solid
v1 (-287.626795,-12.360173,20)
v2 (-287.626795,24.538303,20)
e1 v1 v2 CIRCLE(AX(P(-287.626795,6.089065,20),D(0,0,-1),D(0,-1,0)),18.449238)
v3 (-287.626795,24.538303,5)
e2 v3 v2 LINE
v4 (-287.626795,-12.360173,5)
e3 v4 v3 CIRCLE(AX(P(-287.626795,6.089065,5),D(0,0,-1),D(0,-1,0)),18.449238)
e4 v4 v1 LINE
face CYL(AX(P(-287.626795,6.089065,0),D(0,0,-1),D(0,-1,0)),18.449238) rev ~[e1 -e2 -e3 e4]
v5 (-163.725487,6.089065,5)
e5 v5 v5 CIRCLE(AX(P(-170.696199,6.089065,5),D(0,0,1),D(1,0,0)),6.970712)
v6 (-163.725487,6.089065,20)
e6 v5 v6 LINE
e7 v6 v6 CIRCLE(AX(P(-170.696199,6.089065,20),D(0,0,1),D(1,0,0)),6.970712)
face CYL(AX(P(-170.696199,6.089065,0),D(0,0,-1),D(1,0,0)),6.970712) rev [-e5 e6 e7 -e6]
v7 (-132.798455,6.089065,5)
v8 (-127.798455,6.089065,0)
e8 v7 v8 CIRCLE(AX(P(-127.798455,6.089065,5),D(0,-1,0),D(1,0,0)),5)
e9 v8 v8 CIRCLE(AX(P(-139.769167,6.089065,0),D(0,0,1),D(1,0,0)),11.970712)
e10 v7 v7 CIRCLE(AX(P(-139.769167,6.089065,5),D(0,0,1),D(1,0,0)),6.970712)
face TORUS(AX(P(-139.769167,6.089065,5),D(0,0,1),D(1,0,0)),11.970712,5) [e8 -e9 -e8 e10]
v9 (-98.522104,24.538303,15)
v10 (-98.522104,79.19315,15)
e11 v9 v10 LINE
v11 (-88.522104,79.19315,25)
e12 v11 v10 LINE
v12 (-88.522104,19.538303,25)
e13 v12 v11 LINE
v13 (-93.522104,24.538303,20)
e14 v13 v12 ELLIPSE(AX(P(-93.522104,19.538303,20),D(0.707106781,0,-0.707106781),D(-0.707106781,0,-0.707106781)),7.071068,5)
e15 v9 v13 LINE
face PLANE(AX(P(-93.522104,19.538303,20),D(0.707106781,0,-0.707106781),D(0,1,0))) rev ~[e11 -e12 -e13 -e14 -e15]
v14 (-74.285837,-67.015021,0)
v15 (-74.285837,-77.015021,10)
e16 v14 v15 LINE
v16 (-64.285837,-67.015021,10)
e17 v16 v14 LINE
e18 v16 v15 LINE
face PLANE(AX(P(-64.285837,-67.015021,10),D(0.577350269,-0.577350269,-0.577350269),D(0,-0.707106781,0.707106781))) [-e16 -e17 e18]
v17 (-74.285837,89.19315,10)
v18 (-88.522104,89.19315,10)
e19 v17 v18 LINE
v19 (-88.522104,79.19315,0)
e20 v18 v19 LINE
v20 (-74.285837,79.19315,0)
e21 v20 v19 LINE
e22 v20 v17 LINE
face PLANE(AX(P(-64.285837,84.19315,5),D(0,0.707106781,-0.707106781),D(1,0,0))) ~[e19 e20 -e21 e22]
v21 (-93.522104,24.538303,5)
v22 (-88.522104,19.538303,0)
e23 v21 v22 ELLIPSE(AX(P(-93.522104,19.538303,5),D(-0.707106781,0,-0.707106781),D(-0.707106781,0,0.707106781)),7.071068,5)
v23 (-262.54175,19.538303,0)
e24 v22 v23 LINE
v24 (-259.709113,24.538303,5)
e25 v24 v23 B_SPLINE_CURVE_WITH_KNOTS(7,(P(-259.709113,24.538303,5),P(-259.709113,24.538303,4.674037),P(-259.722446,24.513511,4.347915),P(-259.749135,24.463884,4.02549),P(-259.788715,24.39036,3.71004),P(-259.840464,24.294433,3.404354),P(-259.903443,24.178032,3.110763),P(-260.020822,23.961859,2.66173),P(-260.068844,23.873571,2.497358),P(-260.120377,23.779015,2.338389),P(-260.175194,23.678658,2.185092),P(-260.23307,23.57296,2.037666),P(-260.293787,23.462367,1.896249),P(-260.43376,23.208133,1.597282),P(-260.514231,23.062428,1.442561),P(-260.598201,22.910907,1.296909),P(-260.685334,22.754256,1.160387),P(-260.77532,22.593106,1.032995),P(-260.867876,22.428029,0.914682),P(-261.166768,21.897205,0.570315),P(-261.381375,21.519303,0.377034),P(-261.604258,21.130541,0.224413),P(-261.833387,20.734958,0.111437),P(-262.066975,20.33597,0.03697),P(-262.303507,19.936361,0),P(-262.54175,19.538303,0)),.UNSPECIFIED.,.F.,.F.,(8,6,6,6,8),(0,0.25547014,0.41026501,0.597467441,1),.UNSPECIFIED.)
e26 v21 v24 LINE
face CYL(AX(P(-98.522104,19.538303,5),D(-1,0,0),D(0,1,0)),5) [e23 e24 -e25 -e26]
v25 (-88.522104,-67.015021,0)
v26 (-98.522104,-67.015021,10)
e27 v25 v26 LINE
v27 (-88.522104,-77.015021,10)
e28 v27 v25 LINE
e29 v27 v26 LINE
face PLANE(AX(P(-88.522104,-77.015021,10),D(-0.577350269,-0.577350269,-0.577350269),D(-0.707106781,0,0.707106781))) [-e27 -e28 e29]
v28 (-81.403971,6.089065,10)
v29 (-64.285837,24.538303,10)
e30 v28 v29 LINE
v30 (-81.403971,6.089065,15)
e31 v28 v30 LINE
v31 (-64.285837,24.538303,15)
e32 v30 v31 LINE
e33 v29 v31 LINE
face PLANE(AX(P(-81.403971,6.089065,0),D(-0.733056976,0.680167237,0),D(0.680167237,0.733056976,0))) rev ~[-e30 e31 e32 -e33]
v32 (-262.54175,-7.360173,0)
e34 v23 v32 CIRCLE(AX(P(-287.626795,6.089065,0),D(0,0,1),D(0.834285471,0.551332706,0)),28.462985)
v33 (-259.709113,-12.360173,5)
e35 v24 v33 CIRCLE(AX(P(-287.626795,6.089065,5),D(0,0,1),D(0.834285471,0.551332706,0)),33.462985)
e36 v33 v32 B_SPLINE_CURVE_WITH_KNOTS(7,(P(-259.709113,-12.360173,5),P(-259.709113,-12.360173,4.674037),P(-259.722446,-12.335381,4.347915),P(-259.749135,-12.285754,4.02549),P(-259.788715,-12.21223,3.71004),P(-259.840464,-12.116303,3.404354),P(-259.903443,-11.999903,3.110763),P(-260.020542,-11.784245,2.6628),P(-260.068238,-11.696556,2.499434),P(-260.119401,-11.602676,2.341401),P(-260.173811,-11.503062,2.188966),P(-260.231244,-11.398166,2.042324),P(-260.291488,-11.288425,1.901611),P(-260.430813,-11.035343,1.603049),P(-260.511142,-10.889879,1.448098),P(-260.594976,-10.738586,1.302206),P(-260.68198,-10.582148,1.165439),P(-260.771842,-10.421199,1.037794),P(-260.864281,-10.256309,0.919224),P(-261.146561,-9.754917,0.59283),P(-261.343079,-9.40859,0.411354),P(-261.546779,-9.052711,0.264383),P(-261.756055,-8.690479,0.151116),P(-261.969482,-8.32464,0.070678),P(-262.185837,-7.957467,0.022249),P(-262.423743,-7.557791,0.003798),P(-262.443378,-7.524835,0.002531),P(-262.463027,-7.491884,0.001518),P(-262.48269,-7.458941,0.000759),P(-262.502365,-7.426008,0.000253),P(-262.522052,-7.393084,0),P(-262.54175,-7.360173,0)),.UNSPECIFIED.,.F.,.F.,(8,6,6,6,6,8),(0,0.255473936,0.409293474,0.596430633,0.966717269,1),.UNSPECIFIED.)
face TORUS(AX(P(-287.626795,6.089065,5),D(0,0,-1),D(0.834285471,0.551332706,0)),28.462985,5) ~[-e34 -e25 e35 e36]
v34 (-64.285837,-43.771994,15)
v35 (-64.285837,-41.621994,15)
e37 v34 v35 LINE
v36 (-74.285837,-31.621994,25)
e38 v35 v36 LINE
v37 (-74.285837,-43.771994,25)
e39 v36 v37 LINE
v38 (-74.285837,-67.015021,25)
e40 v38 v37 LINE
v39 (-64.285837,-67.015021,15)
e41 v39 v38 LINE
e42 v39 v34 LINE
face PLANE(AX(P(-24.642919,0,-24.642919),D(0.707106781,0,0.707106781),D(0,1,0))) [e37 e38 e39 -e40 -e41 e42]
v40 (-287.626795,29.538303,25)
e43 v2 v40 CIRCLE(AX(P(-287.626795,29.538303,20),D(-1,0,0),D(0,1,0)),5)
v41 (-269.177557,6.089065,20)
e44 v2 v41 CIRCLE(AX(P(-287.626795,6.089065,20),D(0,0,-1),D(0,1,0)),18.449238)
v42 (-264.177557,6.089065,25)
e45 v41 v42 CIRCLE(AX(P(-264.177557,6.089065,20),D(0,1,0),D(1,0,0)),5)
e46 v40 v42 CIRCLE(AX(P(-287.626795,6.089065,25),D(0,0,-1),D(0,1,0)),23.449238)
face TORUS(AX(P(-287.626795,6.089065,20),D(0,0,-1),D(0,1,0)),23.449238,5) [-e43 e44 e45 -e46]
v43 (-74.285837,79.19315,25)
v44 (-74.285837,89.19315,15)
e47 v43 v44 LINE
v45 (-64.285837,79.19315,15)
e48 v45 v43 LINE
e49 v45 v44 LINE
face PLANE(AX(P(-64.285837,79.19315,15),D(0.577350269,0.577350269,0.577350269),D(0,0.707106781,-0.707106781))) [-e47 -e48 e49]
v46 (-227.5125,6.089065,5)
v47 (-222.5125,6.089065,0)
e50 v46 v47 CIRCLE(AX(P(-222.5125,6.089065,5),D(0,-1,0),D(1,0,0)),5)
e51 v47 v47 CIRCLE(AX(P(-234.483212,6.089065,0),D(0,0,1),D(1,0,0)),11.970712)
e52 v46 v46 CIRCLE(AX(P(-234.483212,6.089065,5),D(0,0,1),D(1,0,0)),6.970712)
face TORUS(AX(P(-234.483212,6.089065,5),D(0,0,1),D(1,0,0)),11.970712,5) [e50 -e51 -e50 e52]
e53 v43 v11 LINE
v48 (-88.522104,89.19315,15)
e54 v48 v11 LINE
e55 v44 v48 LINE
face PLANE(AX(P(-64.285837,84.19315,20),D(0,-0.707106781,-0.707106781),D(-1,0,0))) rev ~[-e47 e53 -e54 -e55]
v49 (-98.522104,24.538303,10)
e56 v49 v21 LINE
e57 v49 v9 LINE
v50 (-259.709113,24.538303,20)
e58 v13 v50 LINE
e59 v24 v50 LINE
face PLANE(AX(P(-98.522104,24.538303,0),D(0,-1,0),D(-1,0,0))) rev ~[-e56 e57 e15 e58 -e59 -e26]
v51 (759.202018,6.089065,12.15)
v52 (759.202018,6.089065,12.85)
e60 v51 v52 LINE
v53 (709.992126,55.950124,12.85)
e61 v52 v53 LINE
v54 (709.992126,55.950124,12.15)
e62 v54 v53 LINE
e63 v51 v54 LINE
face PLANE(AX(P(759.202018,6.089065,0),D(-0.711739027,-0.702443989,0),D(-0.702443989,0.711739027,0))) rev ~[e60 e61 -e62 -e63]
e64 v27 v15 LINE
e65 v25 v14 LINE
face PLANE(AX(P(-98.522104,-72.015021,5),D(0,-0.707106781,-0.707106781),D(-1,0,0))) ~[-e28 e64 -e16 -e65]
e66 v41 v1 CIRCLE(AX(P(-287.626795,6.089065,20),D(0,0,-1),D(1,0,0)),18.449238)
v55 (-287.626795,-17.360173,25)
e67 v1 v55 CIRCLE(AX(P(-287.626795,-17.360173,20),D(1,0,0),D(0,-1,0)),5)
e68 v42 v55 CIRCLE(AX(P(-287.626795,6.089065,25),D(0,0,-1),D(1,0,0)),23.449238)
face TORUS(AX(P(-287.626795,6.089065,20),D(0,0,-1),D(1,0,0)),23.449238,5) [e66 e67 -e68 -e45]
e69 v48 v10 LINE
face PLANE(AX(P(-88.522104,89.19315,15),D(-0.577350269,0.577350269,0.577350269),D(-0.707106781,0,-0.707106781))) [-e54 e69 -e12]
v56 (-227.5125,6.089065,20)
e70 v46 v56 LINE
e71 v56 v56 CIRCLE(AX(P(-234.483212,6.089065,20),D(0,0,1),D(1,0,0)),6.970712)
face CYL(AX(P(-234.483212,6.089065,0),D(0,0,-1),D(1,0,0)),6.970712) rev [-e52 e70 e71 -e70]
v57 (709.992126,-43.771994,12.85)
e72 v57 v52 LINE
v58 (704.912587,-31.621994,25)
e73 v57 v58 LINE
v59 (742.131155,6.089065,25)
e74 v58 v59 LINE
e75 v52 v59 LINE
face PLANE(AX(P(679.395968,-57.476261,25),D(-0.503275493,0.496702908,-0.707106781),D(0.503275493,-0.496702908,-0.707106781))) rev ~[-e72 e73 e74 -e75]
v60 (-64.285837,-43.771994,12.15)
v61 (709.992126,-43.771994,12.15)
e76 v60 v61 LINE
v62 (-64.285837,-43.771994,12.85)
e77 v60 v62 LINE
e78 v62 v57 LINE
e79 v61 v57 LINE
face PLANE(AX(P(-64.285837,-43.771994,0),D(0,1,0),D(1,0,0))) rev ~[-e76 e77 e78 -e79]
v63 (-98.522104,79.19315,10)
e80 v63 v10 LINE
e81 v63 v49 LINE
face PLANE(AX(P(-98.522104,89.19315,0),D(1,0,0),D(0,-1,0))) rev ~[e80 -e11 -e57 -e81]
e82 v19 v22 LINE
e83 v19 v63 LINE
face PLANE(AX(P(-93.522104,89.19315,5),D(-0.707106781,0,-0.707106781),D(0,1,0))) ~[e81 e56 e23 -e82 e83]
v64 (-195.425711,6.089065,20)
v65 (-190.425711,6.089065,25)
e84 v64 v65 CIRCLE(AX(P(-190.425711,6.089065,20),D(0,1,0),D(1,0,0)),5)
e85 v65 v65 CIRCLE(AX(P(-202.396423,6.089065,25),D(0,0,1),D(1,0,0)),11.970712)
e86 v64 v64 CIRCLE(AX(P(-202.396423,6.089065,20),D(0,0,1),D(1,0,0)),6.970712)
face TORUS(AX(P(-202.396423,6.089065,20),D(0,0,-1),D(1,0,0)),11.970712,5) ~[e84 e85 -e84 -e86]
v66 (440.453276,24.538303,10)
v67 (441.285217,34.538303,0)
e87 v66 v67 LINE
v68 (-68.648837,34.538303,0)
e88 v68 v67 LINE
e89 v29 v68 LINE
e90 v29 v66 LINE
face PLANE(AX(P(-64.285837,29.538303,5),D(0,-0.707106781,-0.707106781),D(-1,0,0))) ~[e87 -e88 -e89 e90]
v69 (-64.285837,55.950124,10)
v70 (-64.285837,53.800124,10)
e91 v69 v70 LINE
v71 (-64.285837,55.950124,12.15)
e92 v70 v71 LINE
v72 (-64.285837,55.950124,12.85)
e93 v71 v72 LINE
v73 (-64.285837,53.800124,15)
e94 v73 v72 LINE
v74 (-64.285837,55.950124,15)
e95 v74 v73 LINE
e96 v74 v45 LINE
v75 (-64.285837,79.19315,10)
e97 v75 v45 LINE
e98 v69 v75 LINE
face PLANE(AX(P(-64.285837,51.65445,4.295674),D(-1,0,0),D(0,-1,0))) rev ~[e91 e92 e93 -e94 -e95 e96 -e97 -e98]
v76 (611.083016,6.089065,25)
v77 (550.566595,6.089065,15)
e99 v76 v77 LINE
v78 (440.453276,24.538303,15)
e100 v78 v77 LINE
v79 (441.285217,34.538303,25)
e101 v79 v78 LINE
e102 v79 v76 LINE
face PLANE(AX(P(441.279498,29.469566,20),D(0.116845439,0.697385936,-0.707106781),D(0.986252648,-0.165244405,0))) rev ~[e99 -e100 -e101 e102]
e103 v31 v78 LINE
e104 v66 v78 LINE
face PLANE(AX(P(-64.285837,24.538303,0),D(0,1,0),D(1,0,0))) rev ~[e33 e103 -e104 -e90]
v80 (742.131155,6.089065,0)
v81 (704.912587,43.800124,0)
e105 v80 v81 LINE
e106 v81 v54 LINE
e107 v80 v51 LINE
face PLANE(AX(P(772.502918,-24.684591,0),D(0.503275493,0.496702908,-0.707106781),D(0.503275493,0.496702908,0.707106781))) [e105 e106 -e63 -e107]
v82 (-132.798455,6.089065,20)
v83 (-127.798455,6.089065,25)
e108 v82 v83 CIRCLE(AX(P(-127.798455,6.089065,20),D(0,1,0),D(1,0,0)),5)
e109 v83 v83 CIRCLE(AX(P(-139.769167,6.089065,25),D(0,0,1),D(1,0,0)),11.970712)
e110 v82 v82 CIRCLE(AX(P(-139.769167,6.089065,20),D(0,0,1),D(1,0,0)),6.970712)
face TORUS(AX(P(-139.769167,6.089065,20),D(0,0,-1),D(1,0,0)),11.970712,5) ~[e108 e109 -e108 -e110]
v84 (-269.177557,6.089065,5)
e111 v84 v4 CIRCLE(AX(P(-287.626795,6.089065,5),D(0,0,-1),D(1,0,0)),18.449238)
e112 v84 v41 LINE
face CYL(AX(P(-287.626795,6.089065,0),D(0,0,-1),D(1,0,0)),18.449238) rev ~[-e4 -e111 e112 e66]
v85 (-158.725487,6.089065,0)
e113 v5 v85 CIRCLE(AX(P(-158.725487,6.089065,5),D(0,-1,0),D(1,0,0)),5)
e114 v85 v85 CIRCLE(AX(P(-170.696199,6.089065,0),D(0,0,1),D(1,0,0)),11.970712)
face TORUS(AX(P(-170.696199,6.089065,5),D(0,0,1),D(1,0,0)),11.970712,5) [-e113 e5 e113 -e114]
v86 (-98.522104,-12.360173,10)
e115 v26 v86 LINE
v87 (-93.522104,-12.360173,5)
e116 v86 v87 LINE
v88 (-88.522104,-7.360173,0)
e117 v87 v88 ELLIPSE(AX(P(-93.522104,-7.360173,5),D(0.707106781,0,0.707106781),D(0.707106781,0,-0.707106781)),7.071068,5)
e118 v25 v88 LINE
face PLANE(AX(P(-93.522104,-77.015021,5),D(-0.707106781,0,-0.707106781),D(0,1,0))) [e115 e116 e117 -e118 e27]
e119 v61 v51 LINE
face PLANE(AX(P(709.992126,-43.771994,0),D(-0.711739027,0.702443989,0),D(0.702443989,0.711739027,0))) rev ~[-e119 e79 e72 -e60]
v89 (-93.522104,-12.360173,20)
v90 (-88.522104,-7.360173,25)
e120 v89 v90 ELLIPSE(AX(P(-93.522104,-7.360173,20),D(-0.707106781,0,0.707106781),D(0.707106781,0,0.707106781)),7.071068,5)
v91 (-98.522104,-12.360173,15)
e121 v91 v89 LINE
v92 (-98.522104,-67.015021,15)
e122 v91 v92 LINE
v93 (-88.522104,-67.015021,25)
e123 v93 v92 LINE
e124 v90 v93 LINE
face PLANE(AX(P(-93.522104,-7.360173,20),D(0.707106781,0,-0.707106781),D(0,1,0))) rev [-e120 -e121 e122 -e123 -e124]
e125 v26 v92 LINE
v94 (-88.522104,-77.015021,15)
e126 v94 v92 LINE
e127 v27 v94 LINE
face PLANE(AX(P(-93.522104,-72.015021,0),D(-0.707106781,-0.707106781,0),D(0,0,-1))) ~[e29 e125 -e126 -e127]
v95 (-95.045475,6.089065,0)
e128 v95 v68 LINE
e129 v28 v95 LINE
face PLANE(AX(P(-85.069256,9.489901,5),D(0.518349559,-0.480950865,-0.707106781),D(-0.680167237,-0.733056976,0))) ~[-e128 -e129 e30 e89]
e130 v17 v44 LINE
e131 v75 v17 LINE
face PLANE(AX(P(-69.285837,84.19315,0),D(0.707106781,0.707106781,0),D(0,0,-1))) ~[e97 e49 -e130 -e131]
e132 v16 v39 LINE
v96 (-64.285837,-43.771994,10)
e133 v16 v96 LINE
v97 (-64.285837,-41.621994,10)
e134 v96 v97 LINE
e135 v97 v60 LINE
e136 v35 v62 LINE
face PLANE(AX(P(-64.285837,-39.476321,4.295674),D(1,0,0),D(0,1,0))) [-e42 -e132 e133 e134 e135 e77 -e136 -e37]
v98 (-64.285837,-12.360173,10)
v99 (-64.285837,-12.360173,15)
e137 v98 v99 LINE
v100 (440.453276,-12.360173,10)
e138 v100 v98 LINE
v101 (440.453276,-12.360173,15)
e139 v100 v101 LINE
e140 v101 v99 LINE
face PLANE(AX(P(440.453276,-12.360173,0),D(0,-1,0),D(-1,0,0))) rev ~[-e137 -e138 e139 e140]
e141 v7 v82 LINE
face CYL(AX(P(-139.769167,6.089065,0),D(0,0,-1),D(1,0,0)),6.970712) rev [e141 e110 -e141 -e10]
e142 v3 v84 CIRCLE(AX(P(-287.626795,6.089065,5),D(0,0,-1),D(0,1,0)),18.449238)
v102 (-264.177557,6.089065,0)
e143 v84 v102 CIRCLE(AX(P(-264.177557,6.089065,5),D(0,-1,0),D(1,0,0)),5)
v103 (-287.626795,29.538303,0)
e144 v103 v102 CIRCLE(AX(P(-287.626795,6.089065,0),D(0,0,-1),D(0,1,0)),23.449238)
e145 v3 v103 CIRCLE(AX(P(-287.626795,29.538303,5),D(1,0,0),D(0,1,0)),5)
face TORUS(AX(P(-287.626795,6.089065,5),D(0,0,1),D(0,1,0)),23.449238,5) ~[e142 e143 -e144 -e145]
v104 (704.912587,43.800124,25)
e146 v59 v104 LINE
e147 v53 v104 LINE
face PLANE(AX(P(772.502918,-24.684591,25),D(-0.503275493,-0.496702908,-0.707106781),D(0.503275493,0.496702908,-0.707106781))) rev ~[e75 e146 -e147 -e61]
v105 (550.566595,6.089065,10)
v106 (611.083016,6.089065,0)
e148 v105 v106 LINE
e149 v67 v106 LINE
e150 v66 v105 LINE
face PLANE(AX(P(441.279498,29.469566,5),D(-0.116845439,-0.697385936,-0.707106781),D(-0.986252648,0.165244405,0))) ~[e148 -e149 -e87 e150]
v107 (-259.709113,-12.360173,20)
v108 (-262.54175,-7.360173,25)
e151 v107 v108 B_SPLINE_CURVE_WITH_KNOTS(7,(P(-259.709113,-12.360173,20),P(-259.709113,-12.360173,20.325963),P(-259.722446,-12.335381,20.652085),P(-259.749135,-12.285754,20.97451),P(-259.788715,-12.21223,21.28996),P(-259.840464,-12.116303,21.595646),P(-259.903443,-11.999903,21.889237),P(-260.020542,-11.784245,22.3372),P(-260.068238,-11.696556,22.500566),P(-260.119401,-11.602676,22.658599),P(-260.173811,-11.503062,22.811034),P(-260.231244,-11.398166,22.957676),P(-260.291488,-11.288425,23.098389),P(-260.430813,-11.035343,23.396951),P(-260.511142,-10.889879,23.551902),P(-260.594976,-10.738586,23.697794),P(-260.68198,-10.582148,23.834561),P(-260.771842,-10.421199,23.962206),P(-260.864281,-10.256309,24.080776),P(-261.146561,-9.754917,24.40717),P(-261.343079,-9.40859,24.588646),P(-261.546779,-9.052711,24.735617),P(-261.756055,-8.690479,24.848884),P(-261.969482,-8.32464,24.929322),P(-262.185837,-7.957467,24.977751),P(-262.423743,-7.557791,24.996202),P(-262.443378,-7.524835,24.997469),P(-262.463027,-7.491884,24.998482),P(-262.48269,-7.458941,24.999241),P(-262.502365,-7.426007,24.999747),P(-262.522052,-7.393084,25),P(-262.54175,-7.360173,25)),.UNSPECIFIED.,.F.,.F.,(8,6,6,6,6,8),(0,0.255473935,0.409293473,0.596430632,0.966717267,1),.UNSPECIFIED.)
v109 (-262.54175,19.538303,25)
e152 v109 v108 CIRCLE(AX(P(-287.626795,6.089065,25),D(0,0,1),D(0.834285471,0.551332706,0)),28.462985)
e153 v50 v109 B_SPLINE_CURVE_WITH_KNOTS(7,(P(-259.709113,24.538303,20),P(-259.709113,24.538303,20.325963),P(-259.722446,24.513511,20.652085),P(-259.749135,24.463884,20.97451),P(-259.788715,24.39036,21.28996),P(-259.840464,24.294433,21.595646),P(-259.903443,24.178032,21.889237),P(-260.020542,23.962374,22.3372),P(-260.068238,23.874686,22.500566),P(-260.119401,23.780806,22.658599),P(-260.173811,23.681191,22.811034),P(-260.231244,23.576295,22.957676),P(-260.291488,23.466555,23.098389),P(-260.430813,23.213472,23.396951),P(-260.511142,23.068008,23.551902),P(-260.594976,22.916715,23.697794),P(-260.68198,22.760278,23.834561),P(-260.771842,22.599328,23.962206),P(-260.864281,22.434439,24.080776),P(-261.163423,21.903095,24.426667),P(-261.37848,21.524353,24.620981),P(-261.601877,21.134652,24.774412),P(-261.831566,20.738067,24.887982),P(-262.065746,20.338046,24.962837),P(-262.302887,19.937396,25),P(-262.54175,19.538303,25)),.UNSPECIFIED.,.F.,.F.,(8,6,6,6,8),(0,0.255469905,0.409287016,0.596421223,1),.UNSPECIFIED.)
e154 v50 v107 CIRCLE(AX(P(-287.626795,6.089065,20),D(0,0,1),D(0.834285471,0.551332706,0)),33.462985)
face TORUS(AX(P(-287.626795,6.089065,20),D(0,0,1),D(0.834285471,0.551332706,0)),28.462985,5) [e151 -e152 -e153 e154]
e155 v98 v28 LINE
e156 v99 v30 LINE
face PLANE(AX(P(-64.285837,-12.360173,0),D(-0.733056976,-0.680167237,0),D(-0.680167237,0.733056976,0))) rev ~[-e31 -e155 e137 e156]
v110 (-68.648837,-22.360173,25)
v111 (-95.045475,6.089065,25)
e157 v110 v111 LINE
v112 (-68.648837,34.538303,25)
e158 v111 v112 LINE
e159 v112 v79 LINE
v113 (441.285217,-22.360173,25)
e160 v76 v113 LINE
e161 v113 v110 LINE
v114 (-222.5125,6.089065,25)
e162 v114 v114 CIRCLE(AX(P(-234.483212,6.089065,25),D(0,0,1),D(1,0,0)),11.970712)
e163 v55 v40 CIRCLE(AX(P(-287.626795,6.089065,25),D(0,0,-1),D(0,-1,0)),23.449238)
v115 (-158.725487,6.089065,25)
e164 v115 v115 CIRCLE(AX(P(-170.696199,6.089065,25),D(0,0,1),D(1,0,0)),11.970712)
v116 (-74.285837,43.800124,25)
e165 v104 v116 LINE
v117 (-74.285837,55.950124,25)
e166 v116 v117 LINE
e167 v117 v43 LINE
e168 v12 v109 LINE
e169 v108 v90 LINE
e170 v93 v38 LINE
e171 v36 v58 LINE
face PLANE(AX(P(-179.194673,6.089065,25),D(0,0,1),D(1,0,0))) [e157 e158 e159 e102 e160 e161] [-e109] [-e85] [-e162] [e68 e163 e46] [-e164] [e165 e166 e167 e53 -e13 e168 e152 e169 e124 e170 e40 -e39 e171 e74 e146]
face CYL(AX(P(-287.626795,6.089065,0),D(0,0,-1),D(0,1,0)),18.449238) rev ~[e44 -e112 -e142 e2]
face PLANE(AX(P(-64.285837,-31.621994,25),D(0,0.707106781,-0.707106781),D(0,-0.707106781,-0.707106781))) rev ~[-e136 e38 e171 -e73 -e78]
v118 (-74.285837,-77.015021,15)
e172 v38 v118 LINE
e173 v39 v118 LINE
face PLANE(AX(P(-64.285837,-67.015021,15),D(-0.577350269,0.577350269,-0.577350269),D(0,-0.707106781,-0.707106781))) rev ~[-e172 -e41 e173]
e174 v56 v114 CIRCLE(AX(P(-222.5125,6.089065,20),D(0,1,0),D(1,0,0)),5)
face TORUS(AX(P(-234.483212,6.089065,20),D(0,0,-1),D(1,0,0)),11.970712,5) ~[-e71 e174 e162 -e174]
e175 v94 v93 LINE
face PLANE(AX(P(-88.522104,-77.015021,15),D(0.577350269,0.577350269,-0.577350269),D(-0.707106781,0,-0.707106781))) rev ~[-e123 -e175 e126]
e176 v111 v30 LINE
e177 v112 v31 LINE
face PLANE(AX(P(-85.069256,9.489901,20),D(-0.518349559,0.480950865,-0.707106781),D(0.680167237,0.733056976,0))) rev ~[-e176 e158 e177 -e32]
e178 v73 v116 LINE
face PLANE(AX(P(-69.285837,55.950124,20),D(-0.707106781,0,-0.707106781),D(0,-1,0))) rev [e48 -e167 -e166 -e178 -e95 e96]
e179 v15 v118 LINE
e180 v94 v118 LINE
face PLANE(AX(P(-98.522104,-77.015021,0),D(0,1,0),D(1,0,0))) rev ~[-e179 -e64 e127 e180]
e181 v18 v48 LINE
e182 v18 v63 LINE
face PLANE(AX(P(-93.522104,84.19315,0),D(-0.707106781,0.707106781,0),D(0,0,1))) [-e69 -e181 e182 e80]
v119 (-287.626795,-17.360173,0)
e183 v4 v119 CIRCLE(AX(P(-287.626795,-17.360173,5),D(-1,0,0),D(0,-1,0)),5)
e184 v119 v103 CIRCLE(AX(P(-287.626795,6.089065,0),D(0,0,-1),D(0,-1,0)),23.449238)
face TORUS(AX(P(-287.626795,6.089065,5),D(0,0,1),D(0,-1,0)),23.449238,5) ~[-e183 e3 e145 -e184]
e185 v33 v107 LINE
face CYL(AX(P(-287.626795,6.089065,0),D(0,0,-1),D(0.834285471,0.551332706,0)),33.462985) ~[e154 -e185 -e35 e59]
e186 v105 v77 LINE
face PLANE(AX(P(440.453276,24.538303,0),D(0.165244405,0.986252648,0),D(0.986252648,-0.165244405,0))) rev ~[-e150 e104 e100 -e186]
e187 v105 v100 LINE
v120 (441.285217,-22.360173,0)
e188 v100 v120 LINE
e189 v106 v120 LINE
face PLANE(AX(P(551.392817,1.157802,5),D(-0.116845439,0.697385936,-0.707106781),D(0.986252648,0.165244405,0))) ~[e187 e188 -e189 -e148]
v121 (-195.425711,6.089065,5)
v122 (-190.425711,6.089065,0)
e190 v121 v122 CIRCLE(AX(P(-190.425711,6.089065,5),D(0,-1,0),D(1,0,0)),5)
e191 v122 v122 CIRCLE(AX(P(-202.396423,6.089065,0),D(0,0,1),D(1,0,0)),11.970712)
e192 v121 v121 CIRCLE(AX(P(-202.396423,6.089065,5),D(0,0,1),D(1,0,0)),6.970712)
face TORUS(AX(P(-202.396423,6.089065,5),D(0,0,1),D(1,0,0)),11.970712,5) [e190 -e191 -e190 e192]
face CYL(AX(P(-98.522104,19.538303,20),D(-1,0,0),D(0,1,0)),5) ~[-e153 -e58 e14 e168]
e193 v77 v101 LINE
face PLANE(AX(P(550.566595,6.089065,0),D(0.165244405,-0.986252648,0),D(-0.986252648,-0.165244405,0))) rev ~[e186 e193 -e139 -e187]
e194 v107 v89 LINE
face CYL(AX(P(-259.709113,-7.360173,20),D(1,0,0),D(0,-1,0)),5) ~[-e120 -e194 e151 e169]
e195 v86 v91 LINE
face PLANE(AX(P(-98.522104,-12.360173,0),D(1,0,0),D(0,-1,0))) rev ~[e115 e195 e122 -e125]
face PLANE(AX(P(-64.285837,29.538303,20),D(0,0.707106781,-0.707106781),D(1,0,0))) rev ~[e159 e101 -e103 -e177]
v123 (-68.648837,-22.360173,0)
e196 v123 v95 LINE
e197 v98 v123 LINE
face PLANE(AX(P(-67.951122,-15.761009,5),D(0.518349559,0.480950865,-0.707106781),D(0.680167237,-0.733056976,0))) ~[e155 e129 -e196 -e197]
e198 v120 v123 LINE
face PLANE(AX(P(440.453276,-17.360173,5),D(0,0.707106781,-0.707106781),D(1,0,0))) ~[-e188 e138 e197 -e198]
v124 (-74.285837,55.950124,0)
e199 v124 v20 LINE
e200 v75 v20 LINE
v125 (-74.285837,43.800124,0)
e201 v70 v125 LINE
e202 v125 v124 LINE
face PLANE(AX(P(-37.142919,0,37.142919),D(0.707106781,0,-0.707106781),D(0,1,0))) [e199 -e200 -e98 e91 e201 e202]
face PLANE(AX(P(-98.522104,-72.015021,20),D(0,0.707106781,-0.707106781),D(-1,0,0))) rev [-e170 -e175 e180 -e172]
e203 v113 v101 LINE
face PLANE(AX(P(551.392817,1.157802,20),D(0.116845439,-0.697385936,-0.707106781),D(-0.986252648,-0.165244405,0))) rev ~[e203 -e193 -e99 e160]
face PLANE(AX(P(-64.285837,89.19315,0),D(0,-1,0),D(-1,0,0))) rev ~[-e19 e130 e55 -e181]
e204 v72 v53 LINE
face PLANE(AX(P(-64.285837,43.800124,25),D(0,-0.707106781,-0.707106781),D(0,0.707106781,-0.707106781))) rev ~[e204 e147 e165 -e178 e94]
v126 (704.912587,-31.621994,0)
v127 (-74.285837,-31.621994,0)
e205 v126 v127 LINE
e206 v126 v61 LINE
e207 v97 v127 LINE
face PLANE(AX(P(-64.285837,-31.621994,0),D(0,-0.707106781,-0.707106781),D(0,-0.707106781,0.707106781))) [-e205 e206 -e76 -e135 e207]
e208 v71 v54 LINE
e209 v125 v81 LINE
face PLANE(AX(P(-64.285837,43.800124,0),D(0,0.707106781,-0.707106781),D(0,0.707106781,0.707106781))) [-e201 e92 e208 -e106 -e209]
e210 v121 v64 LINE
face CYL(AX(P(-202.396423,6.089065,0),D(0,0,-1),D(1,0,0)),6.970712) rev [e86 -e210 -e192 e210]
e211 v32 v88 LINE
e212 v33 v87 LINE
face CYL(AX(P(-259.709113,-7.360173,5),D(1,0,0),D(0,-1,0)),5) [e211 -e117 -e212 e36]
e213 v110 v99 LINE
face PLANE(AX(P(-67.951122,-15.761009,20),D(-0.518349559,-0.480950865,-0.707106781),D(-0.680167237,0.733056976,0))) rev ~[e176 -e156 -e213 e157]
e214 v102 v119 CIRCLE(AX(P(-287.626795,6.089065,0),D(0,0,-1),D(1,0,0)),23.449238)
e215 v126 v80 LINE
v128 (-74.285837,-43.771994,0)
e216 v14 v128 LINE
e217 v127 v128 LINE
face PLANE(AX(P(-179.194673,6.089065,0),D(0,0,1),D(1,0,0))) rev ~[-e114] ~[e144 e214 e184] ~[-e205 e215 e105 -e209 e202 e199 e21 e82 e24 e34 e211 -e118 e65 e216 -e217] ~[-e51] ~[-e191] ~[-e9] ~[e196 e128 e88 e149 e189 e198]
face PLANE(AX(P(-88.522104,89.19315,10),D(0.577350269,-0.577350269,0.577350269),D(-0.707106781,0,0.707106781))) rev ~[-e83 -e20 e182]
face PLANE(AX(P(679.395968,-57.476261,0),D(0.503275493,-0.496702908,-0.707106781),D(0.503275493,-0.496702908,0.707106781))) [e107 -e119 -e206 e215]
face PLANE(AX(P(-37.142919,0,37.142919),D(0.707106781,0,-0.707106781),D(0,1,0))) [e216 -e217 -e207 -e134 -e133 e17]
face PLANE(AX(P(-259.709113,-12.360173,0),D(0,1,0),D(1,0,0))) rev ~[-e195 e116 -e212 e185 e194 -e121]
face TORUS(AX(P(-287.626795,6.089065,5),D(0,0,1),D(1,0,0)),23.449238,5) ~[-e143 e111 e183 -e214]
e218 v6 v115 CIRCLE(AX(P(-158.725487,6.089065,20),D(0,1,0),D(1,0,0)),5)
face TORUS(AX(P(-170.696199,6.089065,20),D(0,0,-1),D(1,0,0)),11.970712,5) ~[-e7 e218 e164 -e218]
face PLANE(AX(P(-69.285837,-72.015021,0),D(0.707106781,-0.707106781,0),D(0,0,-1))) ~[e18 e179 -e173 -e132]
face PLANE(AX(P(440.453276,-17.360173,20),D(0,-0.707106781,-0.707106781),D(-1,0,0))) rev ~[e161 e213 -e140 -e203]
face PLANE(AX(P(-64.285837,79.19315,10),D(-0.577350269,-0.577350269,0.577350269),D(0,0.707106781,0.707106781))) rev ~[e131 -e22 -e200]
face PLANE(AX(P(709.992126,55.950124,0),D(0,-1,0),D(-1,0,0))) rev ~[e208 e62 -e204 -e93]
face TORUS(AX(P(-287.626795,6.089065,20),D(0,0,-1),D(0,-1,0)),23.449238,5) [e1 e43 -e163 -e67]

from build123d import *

# Parameters (mm, degrees)
F0_R         = 6.9707118022
F1_DEPTH     = 25
F2_R         = 5
F3_SIZE      = 10
F4_T1_DEPTH  = 805.523911048
F4_T3_DEPTH  = 132.5471516201
F4_T5_DEPTH  = 132.5471516201
F4_T10_DEPTH = 41.2459483038
F4_T15_DEPTH = 41.2459483038
F4_T20_DEPTH = 41.2459483038
F4_T25_DEPTH = 41.2459483038


# Not quite as in the source:
# - a fillet or chamfer that OpenCascade refuses, or shapes differently, is made with other operations: its cross-section is extruded or revolved along the edge and cut away or added
# - a feature names something its author has since deleted; it is built from what else it names


with BuildPart() as f1:
    # F0 (on Top) → F1 (new body)
    with BuildSketch(Plane.XY):
        with BuildLine():
            Line((-98.5221043229, 6.0890647583), (-98.5221043229, 24.5383027941))
            Line((-98.5221043229, 24.5383027941), (-259.7091133391, 24.5383027941))
            ThreePointArc((-259.7091133391, 24.5383027941), (-255.5801081547, 15.7213641607), (-254.1638105515, 6.0890647583))
            ThreePointArc((-254.1638105515, 6.0890647583), (-255.5801081547, -3.5432346441), (-259.7091133391, -12.3601732776))
            Line((-259.7091133391, -12.3601732776), (-98.5221043229, -12.3601732776))
            Line((-98.5221043229, -12.3601732776), (-98.5221043229, 6.0890647583))
        make_face()
        with Locations((-234.4832122326, 6.0890647583)):
            Circle(F0_R, mode=Mode.SUBTRACT)
        with Locations((-202.3964226246, 6.0890647583)):
            Circle(F0_R, mode=Mode.SUBTRACT)
        with Locations((-170.6961989403, 6.0890647583)):
            Circle(F0_R, mode=Mode.SUBTRACT)
        with Locations((-139.769166708, 6.0890647583)):
            Circle(F0_R, mode=Mode.SUBTRACT)
        with BuildLine():
            Line((-287.6267954707, 24.5383027941), (-259.7091133391, 24.5383027941))
            ThreePointArc((-259.7091133391, 24.5383027941), (-321.08978039, 6.0890647583), (-259.7091133391, -12.3601732776))
            Line((-259.7091133391, -12.3601732776), (-287.6267954707, -12.3601732776))
            ThreePointArc((-287.6267954707, -12.3601732776), (-306.0760335065, 6.0890647583), (-287.6267954707, 24.5383027941))
        make_face()
        with BuildLine():
            ThreePointArc((-254.1638105515, 6.0890647583), (-255.5801081547, 15.7213641607), (-259.7091133391, 24.5383027941))
            Line((-259.7091133391, 24.5383027941), (-287.6267954707, 24.5383027941))
            ThreePointArc((-287.6267954707, 24.5383027941), (-274.5812141479, 19.1346460811), (-269.1775574349, 6.0890647583))
            ThreePointArc((-269.1775574349, 6.0890647583), (-274.5812141479, -6.9565165646), (-287.6267954707, -12.3601732776))
            Line((-287.6267954707, -12.3601732776), (-259.7091133391, -12.3601732776))
            ThreePointArc((-259.7091133391, -12.3601732776), (-255.5801081547, -3.5432346441), (-254.1638105515, 6.0890647583))
        make_face()
        Polygon((-98.5221043229, 89.1931504011), (-98.5221043229, 24.5383027941), (-98.5221043229, 6.0890647583), (-81.4039707184, 6.0890647583), (-64.2858371139, 24.5383027941), (-64.2858371139, 55.9501238167), (-64.2858371139, 89.1931504011), align=None)
        Polygon((-64.2858371139, 55.9501238167), (-64.2858371139, 24.5383027941), (0, 24.5383027941), (220.2266380191, 24.5383027941), (440.4532760382, 24.5383027941), (550.5665950477, 6.0890647583), (759.2020183802, 6.0890647583), (709.9921256304, 55.9501238167), align=None)
        Polygon((0, -12.3601732776), (-64.2858371139, -12.3601732776), (-64.2858371139, -43.7719943002), (709.9921256304, -43.7719943002), (759.2020183802, 6.0890647583), (550.5665950477, 6.0890647583), (440.4532760382, -12.3601732776), (220.2266380191, -12.3601732776), align=None)
        Polygon((-81.4039707184, 6.0890647583), (-98.5221043229, 6.0890647583), (-98.5221043229, -12.3601732776), (-98.5221043229, -77.0150208846), (-64.2858371139, -77.0150208846), (-64.2858371139, -43.7719943002), (-64.2858371139, -12.3601732776), align=None)
    extrude(amount=F1_DEPTH)

    # F2
    f2_edges = [f1.edges().sort_by_distance(p)[0] for p in [
        (-179.115609, 24.538303, 25),
        (-179.115609, -12.360173, 25),
        (-287.626795, 24.538303, 25),
        (-321.08978, 6.089065, 25),
        (-321.08978, 6.089065, 0),
        (-287.626795, 24.538303, 0),
        (-179.115609, 24.538303, 0),
        (-179.115609, -12.360173, 0),
        (-241.453924, 6.089065, 0),
        (-209.367134, 6.089065, 0),
        (-177.666911, 6.089065, 0),
        (-146.739879, 6.089065, 0),
        (-177.666911, 6.089065, 25),
        (-146.739879, 6.089065, 25),
        (-209.367134, 6.089065, 25),
        (-241.453924, 6.089065, 25),
    ]]
    fillet(f2_edges, radius=F2_R)

    # F3
    f3_edges = [f1.edges().sort_by_distance(p)[0] for p in [
        (-98.522104, 56.865727, 25),
        (-98.522104, -44.687597, 25),
        (-98.522104, 56.865727, 0),
        (-98.522104, -44.687597, 0),
        (-81.403971, -77.015021, 0),
        (-81.403971, 89.19315, 25),
        (-81.403971, 89.19315, 0),
        (-98.522104, 89.19315, 12.5),
        (-81.403971, -77.015021, 25),
        (-98.522104, -77.015021, 12.5),
        (188.083719, -12.360173, 25),
        (188.083719, 24.538303, 25),
        (495.509936, -3.135554, 25),
        (495.509936, 15.313684, 25),
        (495.509936, -3.135554, 0),
        (188.083719, -12.360173, 0),
        (188.083719, 24.538303, 0),
        (495.509936, 15.313684, 0),
        (-72.844904, -3.135554, 0),
        (-72.844904, 15.313684, 0),
        (-72.844904, 15.313684, 25),
        (-72.844904, -3.135554, 25),
        (-64.285837, 72.571637, 0),
        (-64.285837, 72.571637, 25),
        (-64.285837, -60.393508, 0),
        (-64.285837, -60.393508, 25),
        (-64.285837, 89.19315, 12.5),
        (-64.285837, -77.015021, 12.5),
    ]]
    chamfer(f3_edges, length=F3_SIZE)

    # F4: chamfer of 12.15 on 8 edges, made by hand

    # F4_s2 → F4_t1 (cut)
    with BuildSketch(Plane.YZ.offset(-64.2858371139)):
        Polygon((-31.6219943002, 25), (-43.7719943002, 12.85), (-43.7719943002, 25), align=None)
        Polygon((-31.6219943002, 0), (-43.7719943002, 12.15), (-43.7719943002, 0), align=None)
        Polygon((43.8001238167, 25), (55.9501238167, 12.85), (55.9501238167, 25), align=None)
        Polygon((43.8001238167, 0), (55.9501238167, 12.15), (55.9501238167, 0), align=None)
    extrude(amount=F4_T1_DEPTH, mode=Mode.SUBTRACT)

    # F4_s4 → F4_t3 (cut)
    with BuildSketch(Plane(origin=(306.4970452709, 310.5527450182, 0), x_dir=(0, 0, 1), z_dir=(0.7024439885, 0.7117390273, 0))):
        Polygon((25, 523.9264791351), (12.85, 536.0764791351), (25, 536.0764791351), align=None)
        Polygon((0, 523.9264791351), (12.15, 536.0764791351), (0, 536.0764791351), align=None)
    extrude(amount=F4_T3_DEPTH, mode=Mode.SUBTRACT)

    # F4_s6 → F4_t5 (cut)
    with BuildSketch(Plane(origin=(393.5154564488, -398.7226209611, 0), x_dir=(0, 0, 1), z_dir=(-0.7024439885, 0.7117390273, 0))):
        Polygon((25, 532.4809330058), (12.85, 544.6309330058), (25, 544.6309330058), align=None)
        Polygon((0, 532.4809330058), (12.15, 544.6309330058), (0, 544.6309330058), align=None)
    extrude(amount=F4_T5_DEPTH, mode=Mode.SUBTRACT)


with BuildPart() as f4_tool8:
    # F4_s9 → F4_t10 (new body)
    with BuildSketch(Plane.YZ.offset(-64.2858371139)):
        Polygon((43.8001238167, 0), (55.9501238167, 12.15), (55.9501238167, 0), align=None)
    extrude(amount=-F4_T10_DEPTH)

    split(bisect_by=Plane(origin=(-37.1429185569, 0, 37.1429185569), x_dir=(0, 1, 0), z_dir=(0.7071067812, 0, -0.7071067812)), keep=Keep.TOP)


with BuildPart() as f1_1:
    add(f1.part)

    # F4_t7: cut F4_tool8
    add(f4_tool8.part, mode=Mode.SUBTRACT)


with BuildPart() as f4_tool13:
    # F4_s14 → F4_t15 (new body)
    with BuildSketch(Plane.YZ.offset(-64.2858371139)):
        Polygon((43.8001238167, 25), (55.9501238167, 12.85), (55.9501238167, 25), align=None)
    extrude(amount=-F4_T15_DEPTH)

    split(bisect_by=Plane(origin=(-24.6429185569, 0, -24.6429185569), x_dir=(0, 1, 0), z_dir=(0.7071067812, 0, 0.7071067812)), keep=Keep.TOP)


with BuildPart() as f1_2:
    add(f1_1.part)

    # F4_t12: cut F4_tool13
    add(f4_tool13.part, mode=Mode.SUBTRACT)


with BuildPart() as f4_tool18:
    # F4_s19 → F4_t20 (new body)
    with BuildSketch(Plane.YZ.offset(-64.2858371139)):
        Polygon((-31.6219943002, 0), (-43.7719943002, 12.15), (-43.7719943002, 0), align=None)
    extrude(amount=-F4_T20_DEPTH)

    split(bisect_by=Plane(origin=(-37.1429185569, 0, 37.1429185569), x_dir=(0, 1, 0), z_dir=(0.7071067812, 0, -0.7071067812)), keep=Keep.TOP)


with BuildPart() as f1_3:
    add(f1_2.part)

    # F4_t17: cut F4_tool18
    add(f4_tool18.part, mode=Mode.SUBTRACT)


with BuildPart() as f4_tool23:
    # F4_s24 → F4_t25 (new body)
    with BuildSketch(Plane.YZ.offset(-64.2858371139)):
        Polygon((-31.6219943002, 25), (-43.7719943002, 12.85), (-43.7719943002, 25), align=None)
    extrude(amount=-F4_T25_DEPTH)

    split(bisect_by=Plane(origin=(-24.6429185569, 0, -24.6429185569), x_dir=(0, 1, 0), z_dir=(0.7071067812, 0, 0.7071067812)), keep=Keep.TOP)


with BuildPart() as f1_4:
    add(f1_3.part)

    # F4_t22: cut F4_tool23
    add(f4_tool23.part, mode=Mode.SUBTRACT)


solid = f1_4.part
